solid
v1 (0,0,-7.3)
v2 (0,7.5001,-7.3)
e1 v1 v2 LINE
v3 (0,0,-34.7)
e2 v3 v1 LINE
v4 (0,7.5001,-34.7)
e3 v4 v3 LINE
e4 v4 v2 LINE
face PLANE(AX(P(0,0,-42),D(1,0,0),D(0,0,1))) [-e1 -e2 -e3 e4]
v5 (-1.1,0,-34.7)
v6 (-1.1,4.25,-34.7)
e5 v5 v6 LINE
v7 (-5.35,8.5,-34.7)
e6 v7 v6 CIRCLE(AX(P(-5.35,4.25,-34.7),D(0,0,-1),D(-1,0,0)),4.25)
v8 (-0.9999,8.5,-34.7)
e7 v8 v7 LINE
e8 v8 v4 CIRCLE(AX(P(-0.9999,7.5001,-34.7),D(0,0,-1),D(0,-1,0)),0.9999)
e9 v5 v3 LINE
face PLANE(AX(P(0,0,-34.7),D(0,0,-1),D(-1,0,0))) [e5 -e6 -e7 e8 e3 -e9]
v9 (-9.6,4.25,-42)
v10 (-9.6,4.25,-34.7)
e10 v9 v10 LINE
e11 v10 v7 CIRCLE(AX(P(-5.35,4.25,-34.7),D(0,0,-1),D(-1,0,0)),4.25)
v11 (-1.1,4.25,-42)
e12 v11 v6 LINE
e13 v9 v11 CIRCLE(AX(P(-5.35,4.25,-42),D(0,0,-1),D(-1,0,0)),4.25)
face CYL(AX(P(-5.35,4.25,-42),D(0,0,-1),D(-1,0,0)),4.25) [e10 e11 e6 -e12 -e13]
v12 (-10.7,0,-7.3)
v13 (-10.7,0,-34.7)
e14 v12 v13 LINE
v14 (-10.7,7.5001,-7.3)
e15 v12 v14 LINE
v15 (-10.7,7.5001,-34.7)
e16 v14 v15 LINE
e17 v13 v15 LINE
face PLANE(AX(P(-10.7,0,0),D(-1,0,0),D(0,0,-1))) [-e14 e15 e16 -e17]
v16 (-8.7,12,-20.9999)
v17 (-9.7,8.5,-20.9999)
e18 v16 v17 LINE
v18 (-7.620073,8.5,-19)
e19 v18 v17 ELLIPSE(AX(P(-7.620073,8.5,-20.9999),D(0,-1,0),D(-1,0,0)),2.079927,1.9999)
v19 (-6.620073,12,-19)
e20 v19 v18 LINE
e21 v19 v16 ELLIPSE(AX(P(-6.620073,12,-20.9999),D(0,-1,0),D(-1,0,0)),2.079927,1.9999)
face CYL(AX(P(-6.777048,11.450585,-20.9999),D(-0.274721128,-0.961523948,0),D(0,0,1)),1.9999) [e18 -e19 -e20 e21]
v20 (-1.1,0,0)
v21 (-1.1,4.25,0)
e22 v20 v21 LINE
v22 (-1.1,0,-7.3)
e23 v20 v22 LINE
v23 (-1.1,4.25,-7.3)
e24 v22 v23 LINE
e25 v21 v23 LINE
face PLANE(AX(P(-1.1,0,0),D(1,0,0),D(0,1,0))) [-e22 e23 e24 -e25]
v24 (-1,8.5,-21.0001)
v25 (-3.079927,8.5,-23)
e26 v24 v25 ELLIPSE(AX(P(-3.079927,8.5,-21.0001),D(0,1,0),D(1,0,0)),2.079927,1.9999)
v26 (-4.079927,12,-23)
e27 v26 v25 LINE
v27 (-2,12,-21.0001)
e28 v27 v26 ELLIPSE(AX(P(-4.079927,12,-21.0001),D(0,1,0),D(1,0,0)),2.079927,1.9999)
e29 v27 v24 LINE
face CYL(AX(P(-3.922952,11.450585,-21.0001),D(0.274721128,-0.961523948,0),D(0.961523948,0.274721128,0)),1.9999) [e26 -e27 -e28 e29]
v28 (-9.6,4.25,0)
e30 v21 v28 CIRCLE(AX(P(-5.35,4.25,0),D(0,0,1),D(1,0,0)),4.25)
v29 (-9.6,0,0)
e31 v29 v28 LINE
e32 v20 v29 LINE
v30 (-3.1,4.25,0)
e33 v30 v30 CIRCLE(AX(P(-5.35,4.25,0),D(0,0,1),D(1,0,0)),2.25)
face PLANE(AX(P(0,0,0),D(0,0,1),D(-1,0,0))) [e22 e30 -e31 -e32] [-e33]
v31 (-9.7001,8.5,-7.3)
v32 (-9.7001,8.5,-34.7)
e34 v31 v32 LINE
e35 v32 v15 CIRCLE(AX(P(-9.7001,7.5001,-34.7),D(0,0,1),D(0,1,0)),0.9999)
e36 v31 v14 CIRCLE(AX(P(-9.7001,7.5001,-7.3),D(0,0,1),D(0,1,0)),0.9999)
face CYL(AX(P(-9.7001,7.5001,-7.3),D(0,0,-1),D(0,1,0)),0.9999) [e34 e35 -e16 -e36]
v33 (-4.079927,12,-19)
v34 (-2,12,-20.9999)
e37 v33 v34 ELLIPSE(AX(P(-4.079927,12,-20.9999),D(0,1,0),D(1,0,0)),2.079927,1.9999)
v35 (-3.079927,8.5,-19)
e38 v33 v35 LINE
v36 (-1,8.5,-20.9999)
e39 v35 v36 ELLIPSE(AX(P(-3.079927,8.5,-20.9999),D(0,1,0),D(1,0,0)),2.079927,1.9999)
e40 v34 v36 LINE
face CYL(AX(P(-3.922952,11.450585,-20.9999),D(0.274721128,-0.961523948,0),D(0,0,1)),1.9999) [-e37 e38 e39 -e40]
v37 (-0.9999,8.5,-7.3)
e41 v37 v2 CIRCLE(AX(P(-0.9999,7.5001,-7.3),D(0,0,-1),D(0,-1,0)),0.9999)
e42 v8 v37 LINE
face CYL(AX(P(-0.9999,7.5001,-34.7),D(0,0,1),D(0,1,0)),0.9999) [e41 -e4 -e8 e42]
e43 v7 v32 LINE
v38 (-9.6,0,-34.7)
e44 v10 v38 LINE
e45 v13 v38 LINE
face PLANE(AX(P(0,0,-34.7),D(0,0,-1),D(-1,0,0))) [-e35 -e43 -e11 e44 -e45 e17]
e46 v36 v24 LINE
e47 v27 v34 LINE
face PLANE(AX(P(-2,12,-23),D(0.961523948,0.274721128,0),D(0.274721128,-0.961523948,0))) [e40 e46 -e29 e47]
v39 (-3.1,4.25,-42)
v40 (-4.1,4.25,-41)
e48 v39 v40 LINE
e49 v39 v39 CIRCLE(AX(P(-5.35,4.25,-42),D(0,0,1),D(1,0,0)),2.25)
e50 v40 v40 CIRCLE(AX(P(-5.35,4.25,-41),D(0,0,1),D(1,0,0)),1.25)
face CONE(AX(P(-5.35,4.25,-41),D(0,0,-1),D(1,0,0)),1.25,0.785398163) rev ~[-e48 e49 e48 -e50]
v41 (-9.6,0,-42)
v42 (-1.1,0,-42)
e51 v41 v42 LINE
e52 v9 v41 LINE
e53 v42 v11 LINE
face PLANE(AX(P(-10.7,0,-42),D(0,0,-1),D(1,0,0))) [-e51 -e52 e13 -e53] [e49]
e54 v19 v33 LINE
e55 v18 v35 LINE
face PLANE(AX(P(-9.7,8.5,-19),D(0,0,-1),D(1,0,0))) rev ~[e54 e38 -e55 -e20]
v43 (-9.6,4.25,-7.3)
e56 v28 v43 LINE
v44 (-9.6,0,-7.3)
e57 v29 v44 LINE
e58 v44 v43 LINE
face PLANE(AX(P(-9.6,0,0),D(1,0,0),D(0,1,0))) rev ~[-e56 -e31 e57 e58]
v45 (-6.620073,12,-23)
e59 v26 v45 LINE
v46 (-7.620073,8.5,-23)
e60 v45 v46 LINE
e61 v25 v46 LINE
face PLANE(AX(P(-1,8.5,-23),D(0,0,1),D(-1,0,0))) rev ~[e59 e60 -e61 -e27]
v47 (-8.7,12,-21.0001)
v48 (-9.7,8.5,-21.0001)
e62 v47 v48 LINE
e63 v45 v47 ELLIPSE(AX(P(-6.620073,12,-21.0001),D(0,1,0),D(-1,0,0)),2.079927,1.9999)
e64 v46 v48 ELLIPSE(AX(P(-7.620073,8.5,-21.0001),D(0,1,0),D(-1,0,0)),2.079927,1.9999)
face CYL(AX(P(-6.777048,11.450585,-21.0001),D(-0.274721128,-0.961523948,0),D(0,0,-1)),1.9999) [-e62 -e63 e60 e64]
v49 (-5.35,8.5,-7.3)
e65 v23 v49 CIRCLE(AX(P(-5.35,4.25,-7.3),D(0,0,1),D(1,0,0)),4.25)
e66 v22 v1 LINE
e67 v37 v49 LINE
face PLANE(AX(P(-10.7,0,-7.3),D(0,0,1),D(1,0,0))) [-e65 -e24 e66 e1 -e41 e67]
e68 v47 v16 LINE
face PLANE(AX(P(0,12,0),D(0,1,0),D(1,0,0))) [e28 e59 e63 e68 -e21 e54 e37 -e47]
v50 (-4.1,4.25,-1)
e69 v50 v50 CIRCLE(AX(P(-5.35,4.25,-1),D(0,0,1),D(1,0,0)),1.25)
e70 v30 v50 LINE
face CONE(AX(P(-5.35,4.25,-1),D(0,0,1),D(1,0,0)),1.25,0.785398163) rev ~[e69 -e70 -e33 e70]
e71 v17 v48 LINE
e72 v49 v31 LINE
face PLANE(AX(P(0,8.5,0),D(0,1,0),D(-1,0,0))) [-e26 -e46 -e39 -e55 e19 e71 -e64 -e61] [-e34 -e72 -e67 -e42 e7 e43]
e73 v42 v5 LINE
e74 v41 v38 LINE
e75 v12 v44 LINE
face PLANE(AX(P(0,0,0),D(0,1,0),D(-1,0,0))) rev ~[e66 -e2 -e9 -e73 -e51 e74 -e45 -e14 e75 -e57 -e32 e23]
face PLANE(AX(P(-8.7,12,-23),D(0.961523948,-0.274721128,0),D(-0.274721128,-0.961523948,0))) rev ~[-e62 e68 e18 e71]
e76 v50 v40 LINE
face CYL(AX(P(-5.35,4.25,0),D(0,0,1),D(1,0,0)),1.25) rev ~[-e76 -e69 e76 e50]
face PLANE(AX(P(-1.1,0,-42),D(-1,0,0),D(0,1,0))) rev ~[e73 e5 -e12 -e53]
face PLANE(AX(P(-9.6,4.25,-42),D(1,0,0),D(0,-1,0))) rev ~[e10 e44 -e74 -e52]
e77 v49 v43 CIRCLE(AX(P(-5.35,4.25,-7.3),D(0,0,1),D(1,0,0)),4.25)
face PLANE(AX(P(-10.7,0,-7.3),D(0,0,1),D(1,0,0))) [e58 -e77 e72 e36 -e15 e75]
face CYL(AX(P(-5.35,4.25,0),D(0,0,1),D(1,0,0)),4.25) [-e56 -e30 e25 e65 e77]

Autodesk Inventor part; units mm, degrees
ref_plane "YZ Plane" through (0, 0, 0) normal (1, 0, 0) x (0, 1, 0)
ref_plane "XZ Plane" through (0, 0, 0) normal (0, 1, 0) x (-1, 0, 0)
ref_plane "XY Plane" through (0, 0, 0) normal (0, 0, 1) x (1, 0, 0)
sketch "Sketch1" plane through (0, 0, 0) normal (0, 1, 0) x (-1, 0, 0)
  line L0 (0, 0) -> (10.7, 0)
  line L1 (10.7, 0) -> (10.7, -42)
  line L2 (10.7, -42) -> (0, -42)
  line L3 (0, -42) -> (0, 0)
  dimension "p" = 10.7
  dimension "d1" = 42
extrude "Extrusion1" add sketch "Sketch1" along normal blind 8.5
sketch "Sketch2" plane through (-10.7, 0, 0) normal (0, 0, 1) x (1, 0, 0)
  circle A0 centre (5.35, 4.25) radius 1.25
  line L0 (0, 8.5) -> (10.7, 8.5) projected
  line L1 (0, 0) -> (0, 8.5) projected
  point P0 (10.7, 0)
  dimension "d4" = 2.5
  dimension "d5" = 4.25
  dimension "d6" = 5.35
extrude "Extrusion2" cut sketch "Sketch2" against normal through all
sketch "Sketch3" plane through (-10.7, 0, 0) normal (0, 0, 1) x (1, 0, 0)
  circle A0 centre (5.35, 4.25) radius 1.25 projected
  arc A1 (9.6, 4.25) -> (1.1, 4.25) centre (5.35, 4.25) ccw
  line L0 (10.7, 8.5) -> (0, 8.5) projected
  line L1 (0, 8.5) -> (10.7, 8.5)
  line L2 (10.7, 0) -> (10.7, 8.5) projected
  line L3 (10.7, 8.5) -> (10.7, 0)
  line L4 (0, 0) -> (10.7, 0) projected
  line L5 (10.7, 0) -> (0, 0)
  line L6 (0, 0) -> (0, 8.5) projected
  line L7 (0, 0) -> (0, 8.5)
  line L8 (10.7, 0) -> (0, 0) projected
  line L9 (5.35, 0) -> (1.1, 0)
  line L10 (1.1, 0) -> (1.1, 4.25)
  line L11 (5.35, 0) -> (9.6, 0)
  line L12 (9.6, 0) -> (9.6, 4.25)
  dimension "d35" = 4.25
  dimension "d36" = 4.25
  dimension "d37" = 4.25
extrude "Extrusion3" cut sketch "Sketch3" against normal blind 7.3 contours A1 L0 L2 L4 L12 | A1 L10 L4 L6 L0
sketch "Sketch4" plane through (0, 0, -42) normal (0, 0, -1) x (-1, 0, 0)
  circle A0 centre (5.35, 4.25) radius 1.25 projected
  arc A1 (9.6, 4.25) -> (1.1, 4.25) centre (5.35, 4.25) ccw
  line L0 (0, 8.5) -> (10.7, 8.5) projected
  line L1 (10.7, 0) -> (0, 0) projected
  line L2 (0, 8.5) -> (0, 0)
  line L3 (0, 0) -> (10.7, 0)
  line L4 (10.7, 0) -> (10.7, 8.5)
  line L5 (10.7, 8.5) -> (0, 8.5)
  line L6 (1.1, 0) -> (1.1, 4.25) projected
  line L7 (1.1, 4.25) -> (1.1, 0)
  line L8 (9.6, 4.25) -> (9.6, 0) projected
  line L9 (1.1, 0) -> (9.6, 0) projected
  line L10 (9.6, 4.25) -> (9.6, 0)
extrude "Extrusion4" cut sketch "Sketch4" against normal blind 7.3 contours A1 L0 L4 L1 L8 | A1 L6 L1 L2 L0
sketch "Sketch5" plane through (0, 8.5, 0) normal (0, 1, 0) x (1, 0, 0)
  line L0 (-10.7, 7.3) -> (-10.7, 34.7) projected
  line L1 (0, 34.7) -> (0, 7.3) projected
  line L2 (-1, 23) -> (-9.7, 23)
  line L3 (-9.7, 19) -> (-1, 19)
  line L4 (-9.7, 19) -> (-9.7, 23)
  line L5 (-1, 19) -> (-1, 23)
  point P0 (0, 0)
  dimension "d19" = 4
  dimension "d20" = 4
  dimension "d21" = 8.7
  dimension "d22" = 1
  dimension "d23" = 19
extrude "Extrusion5" add sketch "Sketch5" along normal blind 3.5
sketch "Sketch6" plane through (-1, 8.5, -23) normal (0, 0, -1) x (-1, 0, 0)
  line L0 (8.7, 3.5) -> (0, 3.5) projected
  line L1 (8.7, 3.5) -> (7.7, 3.5)
  line L2 (0, 0) -> (8.7, 0) projected
  line L3 (7.7, 3.5) -> (8.7, 0)
  line L4 (8.7, 0) -> (8.7, 3.5)
  line L5 (0, 3.5) -> (1, 3.5)
  line L6 (1, 3.5) -> (0, 0)
  line L7 (0, 0) -> (0, 3.5)
  point P0 (-1, -8.5)
  dimension "d26" = 1
  dimension "d27" = 1
extrude "Extrusion6" cut sketch "Sketch6" against normal through all contours L4 L3 L0 | L6 L7 L0
fillet "Fillet1" radius 2 4 edges at (-1.5, 10.25, -19) (-1.5, 10.25, -23) (-9.2, 10.25, -19) (-9.2, 10.25, -23)
fillet "Fillet2" radius 1 2 edges at (0, 8.5, -21) (-10.7, 8.5, -21)
chamfer "Chamfer1" distance 1 angle 45 2 edges at (-6.6, 4.25, -42) (-6.6, 4.25, 0)
equation "\"d6\" = 0.5 * p"
properties part number "tracks_center_sod_ii"
